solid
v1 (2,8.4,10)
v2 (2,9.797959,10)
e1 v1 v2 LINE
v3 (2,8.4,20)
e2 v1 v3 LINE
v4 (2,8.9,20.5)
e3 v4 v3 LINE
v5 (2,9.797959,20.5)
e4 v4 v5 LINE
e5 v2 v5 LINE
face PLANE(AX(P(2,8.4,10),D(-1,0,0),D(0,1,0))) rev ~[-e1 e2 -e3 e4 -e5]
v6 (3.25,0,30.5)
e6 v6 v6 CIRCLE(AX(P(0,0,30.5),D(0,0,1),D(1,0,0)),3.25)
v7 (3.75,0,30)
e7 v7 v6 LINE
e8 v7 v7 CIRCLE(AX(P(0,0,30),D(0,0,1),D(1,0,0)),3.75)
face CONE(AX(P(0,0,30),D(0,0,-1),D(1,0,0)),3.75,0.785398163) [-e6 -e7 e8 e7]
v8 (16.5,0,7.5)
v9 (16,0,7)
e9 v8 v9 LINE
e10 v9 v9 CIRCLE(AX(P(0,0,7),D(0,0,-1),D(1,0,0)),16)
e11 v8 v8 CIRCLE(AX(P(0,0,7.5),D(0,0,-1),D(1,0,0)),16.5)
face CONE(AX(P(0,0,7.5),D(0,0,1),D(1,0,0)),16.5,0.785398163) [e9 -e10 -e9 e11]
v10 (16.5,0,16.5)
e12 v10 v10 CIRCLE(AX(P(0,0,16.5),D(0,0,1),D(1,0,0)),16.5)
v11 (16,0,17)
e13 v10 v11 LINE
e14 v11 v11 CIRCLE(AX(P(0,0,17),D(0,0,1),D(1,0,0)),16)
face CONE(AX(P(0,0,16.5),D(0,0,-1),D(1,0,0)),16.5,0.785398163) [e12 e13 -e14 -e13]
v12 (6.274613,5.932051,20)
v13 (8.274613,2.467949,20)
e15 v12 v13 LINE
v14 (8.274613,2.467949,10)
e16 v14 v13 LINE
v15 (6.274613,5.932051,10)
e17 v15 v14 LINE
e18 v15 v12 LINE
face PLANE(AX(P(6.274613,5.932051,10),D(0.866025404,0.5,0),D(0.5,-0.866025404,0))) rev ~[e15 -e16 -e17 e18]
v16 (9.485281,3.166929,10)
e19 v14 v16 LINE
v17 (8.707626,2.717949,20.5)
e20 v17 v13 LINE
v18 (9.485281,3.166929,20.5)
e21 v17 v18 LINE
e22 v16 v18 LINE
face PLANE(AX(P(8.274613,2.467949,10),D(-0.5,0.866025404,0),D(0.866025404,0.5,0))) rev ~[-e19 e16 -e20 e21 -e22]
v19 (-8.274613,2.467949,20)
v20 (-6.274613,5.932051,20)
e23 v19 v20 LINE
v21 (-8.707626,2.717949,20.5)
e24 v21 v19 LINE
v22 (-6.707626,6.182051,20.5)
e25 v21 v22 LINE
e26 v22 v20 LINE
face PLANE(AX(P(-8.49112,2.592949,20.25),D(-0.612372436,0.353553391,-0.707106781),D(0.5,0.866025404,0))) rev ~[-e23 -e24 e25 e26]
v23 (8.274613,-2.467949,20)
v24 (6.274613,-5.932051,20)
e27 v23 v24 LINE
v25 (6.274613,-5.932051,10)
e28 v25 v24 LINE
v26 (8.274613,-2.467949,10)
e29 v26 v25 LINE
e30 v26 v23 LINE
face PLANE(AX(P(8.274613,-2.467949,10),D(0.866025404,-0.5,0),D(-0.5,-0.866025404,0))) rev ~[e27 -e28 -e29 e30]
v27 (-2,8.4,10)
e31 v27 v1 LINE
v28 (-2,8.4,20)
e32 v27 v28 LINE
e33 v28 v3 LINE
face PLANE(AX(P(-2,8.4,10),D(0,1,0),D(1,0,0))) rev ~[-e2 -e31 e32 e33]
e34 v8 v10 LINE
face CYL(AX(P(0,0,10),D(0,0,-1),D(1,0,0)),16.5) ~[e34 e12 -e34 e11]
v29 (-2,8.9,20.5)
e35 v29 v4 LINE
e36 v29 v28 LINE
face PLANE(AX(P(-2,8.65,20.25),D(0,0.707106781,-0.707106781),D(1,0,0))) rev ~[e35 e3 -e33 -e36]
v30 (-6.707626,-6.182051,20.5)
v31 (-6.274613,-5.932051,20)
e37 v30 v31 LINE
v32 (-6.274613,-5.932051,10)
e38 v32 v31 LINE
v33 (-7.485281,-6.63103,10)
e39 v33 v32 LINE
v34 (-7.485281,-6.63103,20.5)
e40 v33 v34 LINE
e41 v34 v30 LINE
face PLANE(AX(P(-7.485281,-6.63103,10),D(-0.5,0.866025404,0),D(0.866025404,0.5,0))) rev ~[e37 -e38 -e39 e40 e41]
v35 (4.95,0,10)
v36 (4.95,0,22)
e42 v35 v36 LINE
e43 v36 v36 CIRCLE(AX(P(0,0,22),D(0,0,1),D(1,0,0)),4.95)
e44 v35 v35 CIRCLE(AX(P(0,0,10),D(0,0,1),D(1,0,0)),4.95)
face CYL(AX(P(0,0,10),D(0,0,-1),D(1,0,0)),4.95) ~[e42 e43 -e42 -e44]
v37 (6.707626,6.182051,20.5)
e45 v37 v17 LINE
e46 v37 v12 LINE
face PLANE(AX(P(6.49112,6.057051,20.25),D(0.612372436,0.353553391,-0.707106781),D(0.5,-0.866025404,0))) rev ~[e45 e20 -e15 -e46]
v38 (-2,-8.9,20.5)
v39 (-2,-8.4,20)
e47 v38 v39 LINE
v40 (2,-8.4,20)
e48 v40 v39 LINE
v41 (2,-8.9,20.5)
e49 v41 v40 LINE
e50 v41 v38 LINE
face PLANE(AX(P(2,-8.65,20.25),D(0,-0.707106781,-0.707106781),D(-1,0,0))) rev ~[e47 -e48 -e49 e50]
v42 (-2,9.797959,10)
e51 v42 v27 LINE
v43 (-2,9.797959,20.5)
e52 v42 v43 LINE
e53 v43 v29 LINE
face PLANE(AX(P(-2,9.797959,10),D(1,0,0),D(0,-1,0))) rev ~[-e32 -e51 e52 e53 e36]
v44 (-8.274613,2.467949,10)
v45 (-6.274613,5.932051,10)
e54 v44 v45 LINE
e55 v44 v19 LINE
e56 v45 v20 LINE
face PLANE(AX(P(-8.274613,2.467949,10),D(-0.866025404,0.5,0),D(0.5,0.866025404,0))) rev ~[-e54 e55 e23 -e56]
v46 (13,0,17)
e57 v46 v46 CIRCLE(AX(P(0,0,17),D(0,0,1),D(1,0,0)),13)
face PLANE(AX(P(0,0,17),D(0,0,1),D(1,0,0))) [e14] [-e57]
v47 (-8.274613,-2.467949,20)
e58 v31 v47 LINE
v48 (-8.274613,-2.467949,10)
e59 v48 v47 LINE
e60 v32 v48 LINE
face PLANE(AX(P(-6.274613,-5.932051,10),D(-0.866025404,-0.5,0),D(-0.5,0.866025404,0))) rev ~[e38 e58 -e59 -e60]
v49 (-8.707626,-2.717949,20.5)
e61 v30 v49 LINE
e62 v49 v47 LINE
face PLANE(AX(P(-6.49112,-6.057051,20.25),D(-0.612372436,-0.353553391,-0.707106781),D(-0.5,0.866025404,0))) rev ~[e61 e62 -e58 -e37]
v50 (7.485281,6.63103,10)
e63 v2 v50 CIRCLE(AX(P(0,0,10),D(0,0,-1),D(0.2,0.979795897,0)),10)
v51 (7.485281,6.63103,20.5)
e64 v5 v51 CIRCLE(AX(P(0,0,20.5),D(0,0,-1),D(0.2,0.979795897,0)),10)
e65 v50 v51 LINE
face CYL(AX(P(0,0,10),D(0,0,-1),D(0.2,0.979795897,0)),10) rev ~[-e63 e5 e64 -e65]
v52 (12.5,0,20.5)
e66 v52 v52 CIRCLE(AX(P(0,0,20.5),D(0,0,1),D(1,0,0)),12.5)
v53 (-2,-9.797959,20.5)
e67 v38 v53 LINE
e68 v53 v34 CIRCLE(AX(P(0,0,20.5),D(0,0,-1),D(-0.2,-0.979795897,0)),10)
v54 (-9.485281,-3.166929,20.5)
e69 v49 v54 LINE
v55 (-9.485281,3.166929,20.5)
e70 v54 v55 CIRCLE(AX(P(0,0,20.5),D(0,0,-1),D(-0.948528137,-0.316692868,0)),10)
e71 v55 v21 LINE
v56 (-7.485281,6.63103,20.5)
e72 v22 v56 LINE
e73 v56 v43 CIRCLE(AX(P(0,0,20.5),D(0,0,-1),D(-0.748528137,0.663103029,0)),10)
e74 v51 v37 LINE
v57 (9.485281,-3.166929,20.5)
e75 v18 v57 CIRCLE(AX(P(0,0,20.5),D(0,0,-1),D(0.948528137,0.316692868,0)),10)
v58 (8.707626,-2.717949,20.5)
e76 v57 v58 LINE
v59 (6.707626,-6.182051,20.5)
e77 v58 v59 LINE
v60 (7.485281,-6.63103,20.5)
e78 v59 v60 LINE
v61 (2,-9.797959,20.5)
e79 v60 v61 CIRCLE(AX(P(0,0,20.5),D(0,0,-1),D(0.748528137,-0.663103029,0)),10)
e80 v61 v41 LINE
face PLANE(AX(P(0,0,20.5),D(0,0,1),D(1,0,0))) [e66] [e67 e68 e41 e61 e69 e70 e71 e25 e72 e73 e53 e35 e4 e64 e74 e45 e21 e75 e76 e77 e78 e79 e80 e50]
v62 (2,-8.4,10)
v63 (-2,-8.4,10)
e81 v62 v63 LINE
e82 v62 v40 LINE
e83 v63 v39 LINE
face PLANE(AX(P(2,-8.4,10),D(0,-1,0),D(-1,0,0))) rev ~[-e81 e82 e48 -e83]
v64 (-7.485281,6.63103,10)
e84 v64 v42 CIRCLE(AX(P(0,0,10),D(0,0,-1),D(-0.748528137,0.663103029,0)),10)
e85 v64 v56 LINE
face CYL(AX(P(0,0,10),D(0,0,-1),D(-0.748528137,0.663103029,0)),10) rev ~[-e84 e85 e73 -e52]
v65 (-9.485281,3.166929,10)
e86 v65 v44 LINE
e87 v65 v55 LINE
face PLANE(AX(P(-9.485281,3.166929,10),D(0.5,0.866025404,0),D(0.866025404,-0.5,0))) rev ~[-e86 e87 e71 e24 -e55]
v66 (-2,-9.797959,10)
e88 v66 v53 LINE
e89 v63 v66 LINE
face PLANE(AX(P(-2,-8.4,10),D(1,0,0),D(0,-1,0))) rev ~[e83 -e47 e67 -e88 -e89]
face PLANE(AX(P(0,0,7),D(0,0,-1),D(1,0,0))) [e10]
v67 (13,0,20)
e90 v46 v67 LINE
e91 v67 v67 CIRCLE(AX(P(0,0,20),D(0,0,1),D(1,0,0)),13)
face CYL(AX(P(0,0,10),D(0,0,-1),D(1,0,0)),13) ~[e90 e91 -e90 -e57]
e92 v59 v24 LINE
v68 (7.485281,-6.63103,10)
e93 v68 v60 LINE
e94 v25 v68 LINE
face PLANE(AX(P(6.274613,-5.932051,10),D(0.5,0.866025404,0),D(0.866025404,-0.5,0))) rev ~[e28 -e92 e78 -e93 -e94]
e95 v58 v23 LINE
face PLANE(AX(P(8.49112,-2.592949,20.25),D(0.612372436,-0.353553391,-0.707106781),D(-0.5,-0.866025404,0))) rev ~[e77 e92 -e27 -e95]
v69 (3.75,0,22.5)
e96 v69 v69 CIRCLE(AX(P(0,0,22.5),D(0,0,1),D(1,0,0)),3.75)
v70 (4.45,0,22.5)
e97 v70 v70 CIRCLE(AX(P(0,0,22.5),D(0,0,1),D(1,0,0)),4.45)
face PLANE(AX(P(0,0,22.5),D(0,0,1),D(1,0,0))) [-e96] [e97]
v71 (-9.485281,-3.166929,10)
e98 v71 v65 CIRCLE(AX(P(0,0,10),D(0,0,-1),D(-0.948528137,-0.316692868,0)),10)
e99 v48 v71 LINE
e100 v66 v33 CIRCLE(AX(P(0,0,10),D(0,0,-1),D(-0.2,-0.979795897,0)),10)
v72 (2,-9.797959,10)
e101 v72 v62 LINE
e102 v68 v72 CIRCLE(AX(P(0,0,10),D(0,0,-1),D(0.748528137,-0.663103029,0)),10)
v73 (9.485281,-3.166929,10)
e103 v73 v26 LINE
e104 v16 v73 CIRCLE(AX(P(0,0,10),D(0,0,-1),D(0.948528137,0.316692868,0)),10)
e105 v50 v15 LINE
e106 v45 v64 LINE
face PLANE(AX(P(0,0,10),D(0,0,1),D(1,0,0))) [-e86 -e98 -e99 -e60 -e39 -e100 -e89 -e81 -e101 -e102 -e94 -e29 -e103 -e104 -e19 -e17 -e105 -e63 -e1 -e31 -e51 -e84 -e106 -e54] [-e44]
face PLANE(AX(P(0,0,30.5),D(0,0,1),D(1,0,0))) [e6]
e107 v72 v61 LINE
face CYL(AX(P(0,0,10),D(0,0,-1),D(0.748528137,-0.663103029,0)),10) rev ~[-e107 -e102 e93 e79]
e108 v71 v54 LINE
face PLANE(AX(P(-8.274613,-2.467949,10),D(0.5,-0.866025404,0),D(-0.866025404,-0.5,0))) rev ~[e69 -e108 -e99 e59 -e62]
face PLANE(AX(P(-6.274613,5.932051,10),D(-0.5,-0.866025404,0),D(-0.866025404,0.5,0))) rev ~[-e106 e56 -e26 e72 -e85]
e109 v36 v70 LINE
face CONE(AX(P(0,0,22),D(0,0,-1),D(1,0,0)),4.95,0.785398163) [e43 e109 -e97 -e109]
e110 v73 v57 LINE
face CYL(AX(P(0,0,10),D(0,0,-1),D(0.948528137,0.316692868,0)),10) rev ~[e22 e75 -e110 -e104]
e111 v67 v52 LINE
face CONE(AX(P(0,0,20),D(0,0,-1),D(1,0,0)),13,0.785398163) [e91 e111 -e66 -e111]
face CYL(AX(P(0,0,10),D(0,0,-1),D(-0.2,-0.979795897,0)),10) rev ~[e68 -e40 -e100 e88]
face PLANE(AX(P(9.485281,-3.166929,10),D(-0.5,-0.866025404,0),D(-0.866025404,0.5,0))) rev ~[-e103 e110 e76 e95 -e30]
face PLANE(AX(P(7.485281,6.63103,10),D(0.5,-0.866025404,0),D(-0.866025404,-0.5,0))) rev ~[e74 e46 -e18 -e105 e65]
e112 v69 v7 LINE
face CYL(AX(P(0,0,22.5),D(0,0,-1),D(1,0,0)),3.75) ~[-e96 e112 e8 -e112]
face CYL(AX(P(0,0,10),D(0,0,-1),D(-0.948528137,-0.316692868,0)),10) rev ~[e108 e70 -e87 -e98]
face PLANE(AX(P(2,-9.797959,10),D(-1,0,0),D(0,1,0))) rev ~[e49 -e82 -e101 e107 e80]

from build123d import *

# Parameters (mm, degrees)
F0_R      = 16.5
F1_DEPTH  = 10
F2_R      = 13
F3_DEPTH  = 10.5
F4_SIZE   = 0.5
F5_R      = 4.95
F6_DEPTH  = 12.5
F7_SIZE   = 0.5
F8_R      = 3.75
F9_DEPTH  = 8
F10_SIZE  = 0.5
F11_R     = 16.5
F11_R_2   = 13
F12_DEPTH = 7
F13_R     = 25
F14_DEPTH = 7
F15_SIZE  = 0.5


with BuildPart() as f1:
    # F0 (on Top) → F1 (new body)
    with BuildSketch(Plane.XY):
        Circle(F0_R)
    extrude(amount=F1_DEPTH)

    # F2 (on face) → F3 (join)
    with BuildSketch(Plane.XY.offset(10)):
        Circle(F2_R)
        with BuildLine():
            ThreePointArc((-7.4852813742, 6.6310302931), (-5, 8.6602540378), (-2, 9.7979589711))
            Line((-2, 9.7979589711), (-2, 8.4))
            Line((-2, 8.4), (2, 8.4))
            Line((2, 8.4), (2, 9.7979589711))
            ThreePointArc((2, 9.7979589711), (5, 8.6602540378), (7.4852813742, 6.6310302931))
            Line((7.4852813742, 6.6310302931), (6.2746133918, 5.9320508076))
            Line((6.2746133918, 5.9320508076), (8.2746133918, 2.4679491924))
            Line((8.2746133918, 2.4679491924), (9.4852813742, 3.166928678))
            ThreePointArc((9.4852813742, 3.166928678), (10, 0), (9.4852813742, -3.166928678))
            Line((9.4852813742, -3.166928678), (8.2746133918, -2.4679491924))
            Line((8.2746133918, -2.4679491924), (6.2746133918, -5.9320508076))
            Line((6.2746133918, -5.9320508076), (7.4852813742, -6.6310302931))
            ThreePointArc((7.4852813742, -6.6310302931), (5, -8.6602540378), (2, -9.7979589711))
            Line((2, -9.7979589711), (2, -8.4))
            Line((2, -8.4), (-2, -8.4))
            Line((-2, -8.4), (-2, -9.7979589711))
            ThreePointArc((-2, -9.7979589711), (-5, -8.6602540378), (-7.4852813742, -6.6310302931))
            Line((-7.4852813742, -6.6310302931), (-6.2746133918, -5.9320508076))
            Line((-6.2746133918, -5.9320508076), (-8.2746133918, -2.4679491924))
            Line((-8.2746133918, -2.4679491924), (-9.4852813742, -3.166928678))
            ThreePointArc((-9.4852813742, -3.166928678), (-10, 0), (-9.4852813742, 3.166928678))
            Line((-9.4852813742, 3.166928678), (-8.2746133918, 2.4679491924))
            Line((-8.2746133918, 2.4679491924), (-6.2746133918, 5.9320508076))
            Line((-6.2746133918, 5.9320508076), (-7.4852813742, 6.6310302931))
        make_face(mode=Mode.SUBTRACT)
    extrude(amount=F3_DEPTH)

    # F4
    f4_edges = [f1.edges().sort_by_distance(p)[0] for p in [
        (0, 8.4, 20.5),
        (-7.274613, 4.2, 20.5),
        (-7.274613, -4.2, 20.5),
        (0, -8.4, 20.5),
        (7.274613, -4.2, 20.5),
        (7.274613, 4.2, 20.5),
    ]]
    chamfer(f4_edges, length=F4_SIZE)

    # F5 (on face) → F6 (join)
    with BuildSketch(Plane.XY.offset(10)):
        Circle(F5_R)
    extrude(amount=F6_DEPTH)

    # F7
    f7_edges = [f1.edges().sort_by_distance(p)[0] for p in [
        (-4.95, 0, 22.5),
    ]]
    chamfer(f7_edges, length=F7_SIZE)

    # F8 (on face) → F9 (join)
    with BuildSketch(Plane.XY.offset(22.5)):
        Circle(F8_R)
    extrude(amount=F9_DEPTH)

    # F10
    f10_edges = [f1.edges().sort_by_distance(p)[0] for p in [
        (-3.75, 0, 30.5),
    ]]
    chamfer(f10_edges, length=F10_SIZE)

    # F11 (on face) → F12 (join)
    with BuildSketch(Plane.XY.offset(10)):
        Circle(F11_R)
        Circle(F11_R_2, mode=Mode.SUBTRACT)
    extrude(amount=F12_DEPTH)

    # F13 (on face) → F14 (cut)
    with BuildSketch(Plane(origin=(0, 0, 0), x_dir=(1, 0, 0), z_dir=(0, 0, -1))):
        Circle(F13_R)
    extrude(amount=-F14_DEPTH, mode=Mode.SUBTRACT)

    # F15
    f15_edges = [f1.edges().sort_by_distance(p)[0] for p in [
        (-13, 0, 20.5),
        (-16.5, 0, 17),
        (-16.5, 0, 7),
    ]]
    chamfer(f15_edges, length=F15_SIZE)


solid = f1.part
